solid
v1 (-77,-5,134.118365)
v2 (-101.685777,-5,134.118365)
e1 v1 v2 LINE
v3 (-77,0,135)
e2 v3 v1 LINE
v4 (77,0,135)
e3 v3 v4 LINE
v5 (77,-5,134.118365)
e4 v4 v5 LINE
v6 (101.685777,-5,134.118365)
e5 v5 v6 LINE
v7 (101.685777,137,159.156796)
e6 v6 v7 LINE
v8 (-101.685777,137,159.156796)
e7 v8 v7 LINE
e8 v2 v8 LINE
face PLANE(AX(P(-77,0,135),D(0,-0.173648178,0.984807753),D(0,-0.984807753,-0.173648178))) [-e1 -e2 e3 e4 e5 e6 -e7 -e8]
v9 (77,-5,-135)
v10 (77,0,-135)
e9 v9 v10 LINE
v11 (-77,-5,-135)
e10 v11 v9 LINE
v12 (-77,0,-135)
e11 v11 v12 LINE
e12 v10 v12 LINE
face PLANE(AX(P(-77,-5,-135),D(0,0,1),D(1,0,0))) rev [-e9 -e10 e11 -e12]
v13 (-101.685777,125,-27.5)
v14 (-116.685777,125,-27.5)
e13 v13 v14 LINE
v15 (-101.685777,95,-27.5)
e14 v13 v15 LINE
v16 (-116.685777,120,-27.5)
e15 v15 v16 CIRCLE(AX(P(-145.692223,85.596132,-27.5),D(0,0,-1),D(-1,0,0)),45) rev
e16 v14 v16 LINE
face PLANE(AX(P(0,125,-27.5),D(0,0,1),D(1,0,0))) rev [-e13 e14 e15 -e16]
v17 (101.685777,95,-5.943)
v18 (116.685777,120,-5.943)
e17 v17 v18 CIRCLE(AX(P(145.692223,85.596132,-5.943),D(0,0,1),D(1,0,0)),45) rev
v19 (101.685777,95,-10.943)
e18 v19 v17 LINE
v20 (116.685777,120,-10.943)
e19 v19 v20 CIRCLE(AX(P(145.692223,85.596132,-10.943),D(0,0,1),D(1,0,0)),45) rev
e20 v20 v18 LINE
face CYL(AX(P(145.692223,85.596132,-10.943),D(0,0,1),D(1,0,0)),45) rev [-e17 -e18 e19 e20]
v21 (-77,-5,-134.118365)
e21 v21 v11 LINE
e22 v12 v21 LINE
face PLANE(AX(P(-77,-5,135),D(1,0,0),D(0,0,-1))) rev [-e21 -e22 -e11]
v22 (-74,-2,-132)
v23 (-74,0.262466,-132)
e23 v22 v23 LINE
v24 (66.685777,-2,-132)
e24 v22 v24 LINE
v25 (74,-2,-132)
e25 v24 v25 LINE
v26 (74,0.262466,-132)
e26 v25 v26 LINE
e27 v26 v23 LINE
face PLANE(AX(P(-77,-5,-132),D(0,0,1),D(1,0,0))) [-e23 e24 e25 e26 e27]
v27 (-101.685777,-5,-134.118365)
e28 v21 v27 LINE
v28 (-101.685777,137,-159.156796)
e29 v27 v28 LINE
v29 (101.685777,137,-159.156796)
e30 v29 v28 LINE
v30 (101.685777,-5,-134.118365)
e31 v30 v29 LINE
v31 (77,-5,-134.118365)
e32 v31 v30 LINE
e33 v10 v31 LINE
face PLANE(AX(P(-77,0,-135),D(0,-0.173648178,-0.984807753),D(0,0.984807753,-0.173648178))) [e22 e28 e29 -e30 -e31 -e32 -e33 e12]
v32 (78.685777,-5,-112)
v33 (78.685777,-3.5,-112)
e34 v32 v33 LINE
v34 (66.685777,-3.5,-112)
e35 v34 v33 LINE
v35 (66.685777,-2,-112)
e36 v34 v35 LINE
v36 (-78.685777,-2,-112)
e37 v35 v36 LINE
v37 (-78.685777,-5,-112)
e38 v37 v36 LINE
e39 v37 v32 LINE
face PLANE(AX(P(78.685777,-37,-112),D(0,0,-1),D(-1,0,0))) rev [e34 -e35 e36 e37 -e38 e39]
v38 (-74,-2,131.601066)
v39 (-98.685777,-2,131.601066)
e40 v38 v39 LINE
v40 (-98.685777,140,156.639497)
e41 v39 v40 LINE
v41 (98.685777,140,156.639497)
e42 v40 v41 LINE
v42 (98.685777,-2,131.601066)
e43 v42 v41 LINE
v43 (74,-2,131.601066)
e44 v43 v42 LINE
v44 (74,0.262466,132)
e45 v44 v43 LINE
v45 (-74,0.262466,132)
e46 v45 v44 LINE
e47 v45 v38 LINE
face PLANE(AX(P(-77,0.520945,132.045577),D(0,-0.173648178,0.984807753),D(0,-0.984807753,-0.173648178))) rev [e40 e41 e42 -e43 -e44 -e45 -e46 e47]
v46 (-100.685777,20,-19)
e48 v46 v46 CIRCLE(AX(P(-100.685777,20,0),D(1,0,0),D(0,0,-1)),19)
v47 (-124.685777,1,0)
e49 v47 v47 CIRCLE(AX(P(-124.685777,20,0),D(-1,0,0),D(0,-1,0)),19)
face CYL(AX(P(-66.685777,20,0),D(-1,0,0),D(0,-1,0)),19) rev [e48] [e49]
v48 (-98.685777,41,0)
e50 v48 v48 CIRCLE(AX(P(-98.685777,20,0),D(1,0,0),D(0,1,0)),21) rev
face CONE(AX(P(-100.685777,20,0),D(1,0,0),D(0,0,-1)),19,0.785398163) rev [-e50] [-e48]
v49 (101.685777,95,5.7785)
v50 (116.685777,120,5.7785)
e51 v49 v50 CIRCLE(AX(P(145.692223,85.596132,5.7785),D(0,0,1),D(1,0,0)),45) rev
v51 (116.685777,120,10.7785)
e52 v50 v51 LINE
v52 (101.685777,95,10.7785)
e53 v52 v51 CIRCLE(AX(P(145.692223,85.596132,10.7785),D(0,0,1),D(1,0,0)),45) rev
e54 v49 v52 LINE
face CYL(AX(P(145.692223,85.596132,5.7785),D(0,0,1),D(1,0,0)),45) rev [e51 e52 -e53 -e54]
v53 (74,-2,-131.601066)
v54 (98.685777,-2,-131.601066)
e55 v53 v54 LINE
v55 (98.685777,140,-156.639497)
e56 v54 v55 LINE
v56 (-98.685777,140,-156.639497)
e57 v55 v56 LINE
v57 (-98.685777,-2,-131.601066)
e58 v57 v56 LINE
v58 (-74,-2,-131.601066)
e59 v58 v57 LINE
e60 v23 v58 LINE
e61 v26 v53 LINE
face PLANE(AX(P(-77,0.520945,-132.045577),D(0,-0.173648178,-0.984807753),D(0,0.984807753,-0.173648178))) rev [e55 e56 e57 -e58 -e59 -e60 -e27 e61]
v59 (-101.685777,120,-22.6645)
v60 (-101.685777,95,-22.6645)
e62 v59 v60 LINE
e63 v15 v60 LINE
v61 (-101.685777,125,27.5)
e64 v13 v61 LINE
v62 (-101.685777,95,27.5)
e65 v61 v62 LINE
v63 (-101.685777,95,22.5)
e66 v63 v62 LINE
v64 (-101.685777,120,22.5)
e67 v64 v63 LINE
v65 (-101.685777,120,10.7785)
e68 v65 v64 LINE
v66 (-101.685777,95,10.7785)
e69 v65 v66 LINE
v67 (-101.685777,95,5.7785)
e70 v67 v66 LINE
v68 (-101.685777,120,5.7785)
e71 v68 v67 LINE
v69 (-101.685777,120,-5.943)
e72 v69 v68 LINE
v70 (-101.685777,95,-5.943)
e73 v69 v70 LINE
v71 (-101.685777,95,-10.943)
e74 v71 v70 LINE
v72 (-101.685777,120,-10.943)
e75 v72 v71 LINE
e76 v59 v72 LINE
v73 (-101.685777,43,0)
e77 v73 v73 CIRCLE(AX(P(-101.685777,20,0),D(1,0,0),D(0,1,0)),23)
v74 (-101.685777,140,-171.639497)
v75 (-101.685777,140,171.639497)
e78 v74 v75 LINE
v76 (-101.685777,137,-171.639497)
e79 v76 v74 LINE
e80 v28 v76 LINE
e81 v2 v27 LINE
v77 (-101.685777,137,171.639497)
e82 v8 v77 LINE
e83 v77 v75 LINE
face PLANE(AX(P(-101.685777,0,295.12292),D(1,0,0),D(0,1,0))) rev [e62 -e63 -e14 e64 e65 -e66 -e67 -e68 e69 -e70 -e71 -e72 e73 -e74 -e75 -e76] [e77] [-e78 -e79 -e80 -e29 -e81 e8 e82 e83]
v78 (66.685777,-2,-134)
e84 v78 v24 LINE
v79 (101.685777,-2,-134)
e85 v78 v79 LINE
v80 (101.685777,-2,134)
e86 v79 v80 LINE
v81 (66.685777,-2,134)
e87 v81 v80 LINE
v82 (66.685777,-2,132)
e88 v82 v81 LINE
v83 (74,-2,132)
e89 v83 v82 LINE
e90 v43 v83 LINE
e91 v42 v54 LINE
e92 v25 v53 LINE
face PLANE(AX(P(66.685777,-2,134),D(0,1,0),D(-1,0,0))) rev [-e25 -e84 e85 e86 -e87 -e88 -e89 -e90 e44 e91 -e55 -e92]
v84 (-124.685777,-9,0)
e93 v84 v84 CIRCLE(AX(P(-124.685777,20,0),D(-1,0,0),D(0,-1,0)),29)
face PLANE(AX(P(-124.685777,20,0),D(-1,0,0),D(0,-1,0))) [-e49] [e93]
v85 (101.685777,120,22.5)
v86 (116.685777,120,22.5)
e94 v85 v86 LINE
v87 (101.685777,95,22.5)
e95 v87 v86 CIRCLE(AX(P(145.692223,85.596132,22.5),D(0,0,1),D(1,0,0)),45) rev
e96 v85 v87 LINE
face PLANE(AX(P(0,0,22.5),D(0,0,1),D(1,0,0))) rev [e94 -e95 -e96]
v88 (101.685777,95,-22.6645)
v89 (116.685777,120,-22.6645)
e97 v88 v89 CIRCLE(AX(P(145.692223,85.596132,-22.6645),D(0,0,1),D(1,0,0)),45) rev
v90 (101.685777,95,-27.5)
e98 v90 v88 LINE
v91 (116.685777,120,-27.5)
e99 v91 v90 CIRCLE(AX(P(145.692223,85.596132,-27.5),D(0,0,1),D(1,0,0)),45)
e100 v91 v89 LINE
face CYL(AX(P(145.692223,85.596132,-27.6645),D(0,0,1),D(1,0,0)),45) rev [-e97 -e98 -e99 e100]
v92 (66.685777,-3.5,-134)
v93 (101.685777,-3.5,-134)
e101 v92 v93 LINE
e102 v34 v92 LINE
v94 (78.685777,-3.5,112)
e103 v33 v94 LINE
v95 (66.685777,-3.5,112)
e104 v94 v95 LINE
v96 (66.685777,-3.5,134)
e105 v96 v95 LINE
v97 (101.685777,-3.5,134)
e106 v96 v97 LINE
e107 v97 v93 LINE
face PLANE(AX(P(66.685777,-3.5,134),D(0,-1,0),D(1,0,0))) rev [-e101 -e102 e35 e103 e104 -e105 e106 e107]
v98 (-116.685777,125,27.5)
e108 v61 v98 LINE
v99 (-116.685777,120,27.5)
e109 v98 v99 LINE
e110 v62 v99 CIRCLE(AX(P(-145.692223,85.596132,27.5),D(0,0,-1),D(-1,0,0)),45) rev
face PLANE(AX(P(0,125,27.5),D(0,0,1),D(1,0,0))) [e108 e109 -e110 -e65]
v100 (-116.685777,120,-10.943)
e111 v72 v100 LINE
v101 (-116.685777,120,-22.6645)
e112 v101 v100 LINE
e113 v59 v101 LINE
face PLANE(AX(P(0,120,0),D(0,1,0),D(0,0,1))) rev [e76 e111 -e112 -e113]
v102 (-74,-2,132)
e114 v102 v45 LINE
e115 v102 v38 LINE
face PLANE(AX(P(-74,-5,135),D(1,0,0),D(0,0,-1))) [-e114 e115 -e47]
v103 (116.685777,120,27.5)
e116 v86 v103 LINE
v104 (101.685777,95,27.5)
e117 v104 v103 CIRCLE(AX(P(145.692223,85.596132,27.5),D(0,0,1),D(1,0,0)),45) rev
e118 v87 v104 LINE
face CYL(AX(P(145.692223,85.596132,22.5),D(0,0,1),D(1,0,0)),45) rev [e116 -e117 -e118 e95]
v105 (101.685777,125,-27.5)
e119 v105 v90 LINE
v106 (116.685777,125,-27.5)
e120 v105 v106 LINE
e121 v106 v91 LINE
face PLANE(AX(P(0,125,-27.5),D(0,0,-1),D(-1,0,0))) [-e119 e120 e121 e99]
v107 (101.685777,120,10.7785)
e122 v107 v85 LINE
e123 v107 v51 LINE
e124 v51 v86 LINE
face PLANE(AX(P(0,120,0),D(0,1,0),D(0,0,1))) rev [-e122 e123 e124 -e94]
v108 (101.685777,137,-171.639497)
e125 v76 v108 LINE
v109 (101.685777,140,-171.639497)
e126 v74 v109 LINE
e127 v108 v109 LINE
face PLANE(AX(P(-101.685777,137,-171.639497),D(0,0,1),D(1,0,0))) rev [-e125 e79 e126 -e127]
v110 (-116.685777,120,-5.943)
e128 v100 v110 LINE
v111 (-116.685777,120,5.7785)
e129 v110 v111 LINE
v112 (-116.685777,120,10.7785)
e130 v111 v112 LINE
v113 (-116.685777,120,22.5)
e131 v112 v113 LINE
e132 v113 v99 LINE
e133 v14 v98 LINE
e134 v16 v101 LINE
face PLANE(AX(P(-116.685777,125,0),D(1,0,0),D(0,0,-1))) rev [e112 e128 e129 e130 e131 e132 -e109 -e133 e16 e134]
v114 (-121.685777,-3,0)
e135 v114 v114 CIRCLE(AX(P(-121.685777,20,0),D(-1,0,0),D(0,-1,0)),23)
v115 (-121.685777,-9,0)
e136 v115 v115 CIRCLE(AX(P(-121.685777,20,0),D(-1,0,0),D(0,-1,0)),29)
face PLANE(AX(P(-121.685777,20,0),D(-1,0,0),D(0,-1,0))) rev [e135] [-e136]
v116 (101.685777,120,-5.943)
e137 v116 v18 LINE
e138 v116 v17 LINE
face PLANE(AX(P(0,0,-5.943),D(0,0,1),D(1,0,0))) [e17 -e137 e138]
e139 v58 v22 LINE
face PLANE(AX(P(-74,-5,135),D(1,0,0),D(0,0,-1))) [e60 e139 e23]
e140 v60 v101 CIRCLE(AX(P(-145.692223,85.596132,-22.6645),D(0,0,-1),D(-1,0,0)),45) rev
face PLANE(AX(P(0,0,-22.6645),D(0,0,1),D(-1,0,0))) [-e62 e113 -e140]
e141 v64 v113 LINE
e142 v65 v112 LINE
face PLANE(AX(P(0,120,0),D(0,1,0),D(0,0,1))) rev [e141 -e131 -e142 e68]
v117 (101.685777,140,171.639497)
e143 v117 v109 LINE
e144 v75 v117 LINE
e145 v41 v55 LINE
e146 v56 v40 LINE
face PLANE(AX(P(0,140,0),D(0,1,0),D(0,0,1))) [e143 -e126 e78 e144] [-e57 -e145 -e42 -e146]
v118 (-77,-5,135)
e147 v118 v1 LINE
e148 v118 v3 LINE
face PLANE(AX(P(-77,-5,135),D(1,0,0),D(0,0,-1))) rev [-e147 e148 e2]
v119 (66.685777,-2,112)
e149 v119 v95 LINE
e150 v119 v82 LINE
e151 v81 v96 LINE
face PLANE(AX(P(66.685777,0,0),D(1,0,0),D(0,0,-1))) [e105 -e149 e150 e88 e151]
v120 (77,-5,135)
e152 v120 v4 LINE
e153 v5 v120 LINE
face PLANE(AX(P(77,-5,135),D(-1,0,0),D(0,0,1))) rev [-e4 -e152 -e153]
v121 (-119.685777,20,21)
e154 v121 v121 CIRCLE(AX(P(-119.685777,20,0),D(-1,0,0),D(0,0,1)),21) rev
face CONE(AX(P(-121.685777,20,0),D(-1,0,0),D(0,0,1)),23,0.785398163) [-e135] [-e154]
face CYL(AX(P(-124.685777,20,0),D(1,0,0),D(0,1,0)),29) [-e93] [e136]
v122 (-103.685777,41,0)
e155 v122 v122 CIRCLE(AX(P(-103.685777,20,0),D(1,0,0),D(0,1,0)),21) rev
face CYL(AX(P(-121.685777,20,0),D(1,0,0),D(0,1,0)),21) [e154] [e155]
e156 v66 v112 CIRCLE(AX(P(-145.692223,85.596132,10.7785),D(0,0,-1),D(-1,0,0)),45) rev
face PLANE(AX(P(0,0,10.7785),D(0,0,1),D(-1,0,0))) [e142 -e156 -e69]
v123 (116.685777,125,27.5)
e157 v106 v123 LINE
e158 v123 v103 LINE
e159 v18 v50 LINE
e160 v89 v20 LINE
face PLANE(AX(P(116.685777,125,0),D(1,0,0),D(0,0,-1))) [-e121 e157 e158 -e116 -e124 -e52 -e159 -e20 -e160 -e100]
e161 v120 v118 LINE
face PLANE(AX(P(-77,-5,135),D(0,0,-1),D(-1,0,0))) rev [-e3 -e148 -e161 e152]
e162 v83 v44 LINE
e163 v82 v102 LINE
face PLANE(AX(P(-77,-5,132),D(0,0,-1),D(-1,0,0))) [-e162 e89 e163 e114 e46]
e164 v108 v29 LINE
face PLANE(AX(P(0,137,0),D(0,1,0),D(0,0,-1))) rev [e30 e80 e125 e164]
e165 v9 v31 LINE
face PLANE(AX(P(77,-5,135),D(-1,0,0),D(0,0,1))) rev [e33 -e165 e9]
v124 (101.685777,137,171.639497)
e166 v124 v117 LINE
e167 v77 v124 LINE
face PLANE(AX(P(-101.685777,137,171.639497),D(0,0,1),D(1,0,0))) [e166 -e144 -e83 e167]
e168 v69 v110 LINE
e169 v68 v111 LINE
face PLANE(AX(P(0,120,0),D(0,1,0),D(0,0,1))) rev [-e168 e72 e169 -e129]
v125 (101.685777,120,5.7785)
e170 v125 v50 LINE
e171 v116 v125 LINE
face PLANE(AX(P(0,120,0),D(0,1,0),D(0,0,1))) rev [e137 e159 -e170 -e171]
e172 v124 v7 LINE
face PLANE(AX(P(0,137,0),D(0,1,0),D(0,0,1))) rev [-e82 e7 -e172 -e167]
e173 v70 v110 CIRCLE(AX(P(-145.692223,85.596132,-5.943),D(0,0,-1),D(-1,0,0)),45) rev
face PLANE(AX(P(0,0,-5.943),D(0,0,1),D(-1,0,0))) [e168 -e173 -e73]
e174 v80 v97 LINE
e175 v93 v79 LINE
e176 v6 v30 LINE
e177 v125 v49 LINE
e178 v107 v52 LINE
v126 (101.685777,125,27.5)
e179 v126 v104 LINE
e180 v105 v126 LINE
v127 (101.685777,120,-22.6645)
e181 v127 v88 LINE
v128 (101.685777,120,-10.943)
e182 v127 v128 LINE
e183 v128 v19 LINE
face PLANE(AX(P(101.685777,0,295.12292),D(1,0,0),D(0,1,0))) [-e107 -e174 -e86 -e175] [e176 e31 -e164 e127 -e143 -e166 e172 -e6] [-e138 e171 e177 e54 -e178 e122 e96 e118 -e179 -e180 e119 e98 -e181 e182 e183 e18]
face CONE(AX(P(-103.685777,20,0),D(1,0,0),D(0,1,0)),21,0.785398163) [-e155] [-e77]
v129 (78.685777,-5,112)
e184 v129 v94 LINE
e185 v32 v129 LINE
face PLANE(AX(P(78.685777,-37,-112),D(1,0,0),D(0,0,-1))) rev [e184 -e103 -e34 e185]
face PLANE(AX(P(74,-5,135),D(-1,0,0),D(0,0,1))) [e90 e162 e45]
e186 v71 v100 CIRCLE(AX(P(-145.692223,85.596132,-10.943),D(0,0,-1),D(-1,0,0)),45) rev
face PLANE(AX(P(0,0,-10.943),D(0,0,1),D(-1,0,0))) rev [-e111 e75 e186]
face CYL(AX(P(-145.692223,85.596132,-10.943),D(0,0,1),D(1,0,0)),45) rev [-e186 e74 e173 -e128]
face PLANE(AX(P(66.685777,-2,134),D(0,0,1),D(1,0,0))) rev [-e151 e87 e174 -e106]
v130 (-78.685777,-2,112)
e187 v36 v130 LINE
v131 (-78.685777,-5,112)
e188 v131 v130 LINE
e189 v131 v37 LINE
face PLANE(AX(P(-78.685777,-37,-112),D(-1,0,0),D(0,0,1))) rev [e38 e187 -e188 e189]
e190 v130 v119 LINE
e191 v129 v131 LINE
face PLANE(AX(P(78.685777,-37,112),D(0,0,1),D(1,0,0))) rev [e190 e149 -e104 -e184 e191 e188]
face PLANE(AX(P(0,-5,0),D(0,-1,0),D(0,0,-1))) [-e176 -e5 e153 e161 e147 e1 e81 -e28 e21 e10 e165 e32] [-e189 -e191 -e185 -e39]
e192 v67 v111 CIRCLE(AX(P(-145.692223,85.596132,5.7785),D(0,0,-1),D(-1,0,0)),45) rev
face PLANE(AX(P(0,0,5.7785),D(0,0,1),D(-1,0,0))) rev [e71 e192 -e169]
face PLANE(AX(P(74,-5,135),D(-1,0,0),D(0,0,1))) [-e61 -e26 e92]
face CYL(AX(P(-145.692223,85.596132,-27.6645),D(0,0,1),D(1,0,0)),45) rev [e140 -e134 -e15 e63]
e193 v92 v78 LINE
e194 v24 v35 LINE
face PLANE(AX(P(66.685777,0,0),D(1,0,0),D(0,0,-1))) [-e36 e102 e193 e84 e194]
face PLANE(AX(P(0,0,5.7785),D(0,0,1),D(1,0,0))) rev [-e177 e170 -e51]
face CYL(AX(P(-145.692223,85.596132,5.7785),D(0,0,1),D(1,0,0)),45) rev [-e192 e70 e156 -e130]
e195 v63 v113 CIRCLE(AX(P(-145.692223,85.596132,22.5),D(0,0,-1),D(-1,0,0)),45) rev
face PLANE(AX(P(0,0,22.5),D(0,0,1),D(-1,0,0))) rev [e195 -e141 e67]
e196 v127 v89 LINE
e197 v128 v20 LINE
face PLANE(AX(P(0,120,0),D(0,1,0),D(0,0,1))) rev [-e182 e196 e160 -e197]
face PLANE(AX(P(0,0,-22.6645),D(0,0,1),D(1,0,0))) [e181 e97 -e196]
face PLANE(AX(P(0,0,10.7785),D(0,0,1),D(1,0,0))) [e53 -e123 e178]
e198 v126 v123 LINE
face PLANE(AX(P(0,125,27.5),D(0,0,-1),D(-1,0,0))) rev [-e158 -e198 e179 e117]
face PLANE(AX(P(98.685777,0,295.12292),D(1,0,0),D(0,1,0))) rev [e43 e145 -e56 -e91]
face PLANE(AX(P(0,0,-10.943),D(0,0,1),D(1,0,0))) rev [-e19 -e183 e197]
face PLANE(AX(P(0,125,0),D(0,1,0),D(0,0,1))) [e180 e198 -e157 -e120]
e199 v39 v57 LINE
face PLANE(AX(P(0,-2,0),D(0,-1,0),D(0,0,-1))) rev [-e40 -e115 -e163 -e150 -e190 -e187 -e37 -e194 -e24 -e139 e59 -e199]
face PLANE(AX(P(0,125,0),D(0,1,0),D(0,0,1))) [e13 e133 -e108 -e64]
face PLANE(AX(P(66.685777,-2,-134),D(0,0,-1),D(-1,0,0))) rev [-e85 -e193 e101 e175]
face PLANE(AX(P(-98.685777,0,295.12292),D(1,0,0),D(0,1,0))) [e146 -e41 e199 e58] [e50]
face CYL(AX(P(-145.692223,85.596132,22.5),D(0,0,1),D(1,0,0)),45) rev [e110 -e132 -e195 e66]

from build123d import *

# Parameters (mm, degrees)
SKETCH1_W                       = 154
SKETCH1_H                       = 270
BOSS_EXTRUDE1_DEPTH             = 140
BOSS_EXTRUDE1_DRAFT             = -10
SKETCH2_W                       = 154
SKETCH2_H                       = 270
BOSS_EXTRUDE2_DEPTH             = 5
BOSS_EXTRUDE3_REACH             = 237.456
BOSS_EXTRUDE3_DIRECTION_2_REACH = 237.456
SHELL1_T                        = -3
SKETCH5_W                       = 15
SKETCH5_H                       = 55
BOSS_EXTRUDE4_DEPTH             = 5
BOSS_EXTRUDE5_DEPTH             = 5
LPATTERN1_COUNT                 = 4
LPATTERN1_PITCH                 = 16.7215
SKETCH7_W                       = 15
SKETCH7_H                       = 0.1645
CUT_EXTRUDE2_DEPTH              = 234.966061846
MIRROR2_START                   = -27.5
MIRROR2_OUTLINE_W               = 15
MIRROR2_OUTLINE_H               = 5
MIRROR2_DEPTH                   = 55
MIRROR2_START_2                 = -10.943
MIRROR2_2_DEPTH                 = 5
MIRROR2_START_3                 = 5.7785
MIRROR2_3_DEPTH                 = 5
MIRROR2_START_4                 = 22.5
MIRROR2_4_DEPTH                 = 5
MIRROR2_5_DEPTH                 = 4.8355
SKETCH8_W                       = 268
SKETCH8_H                       = 1.5
CUT_EXTRUDE3_DEPTH              = 35
SKETCH9_R                       = 19
CUT_EXTRUDE4_DEPTH              = 35
SKETCH10_W                      = 157.371554598
SKETCH10_H                      = 224
CUT_EXTRUDE5_DEPTH              = 35
BOSS_EXTRUDE6_START             = 20
SKETCH11_R                      = 21
SKETCH11_R_2                    = 19
BOSS_EXTRUDE6_DEPTH             = 20
BOSS_EXTRUDE7_START             = 3
SKETCH12_R                      = 29
SKETCH12_R_2                    = 19
BOSS_EXTRUDE7_DEPTH             = 3
CHAMFER1_SIZE                   = 2
BOSS_EXTRUDE8_START             = 137
BOSS_EXTRUDE8_2_OUTLINE_W       = 203.371554598
BOSS_EXTRUDE8_2_OUTLINE_H       = 12.482701107
BOSS_EXTRUDE8_2_DEPTH           = 3


with BuildPart() as part:
    # Sketch1 → Boss-Extrude1 (with draft: the straight prism first)
    with BuildSketch(Plane(origin=(0, 0, 0), x_dir=(1, 0, 0), z_dir=(0, 1, 0))):
        Rectangle(SKETCH1_W, SKETCH1_H)
    extrude(amount=BOSS_EXTRUDE1_DEPTH)
    # Boss-Extrude1: the draft: its side faces are tilted about the plane it starts from
    boss_extrude1_sides = [part.faces().sort_by_distance(p)[0] for p in [
        (-77, 70, 0),
        (0, 70, 135),
        (77, 70, 0),
        (0, 70, -135),
    ]]
    draft(boss_extrude1_sides, Plane(origin=(0, 0, 0), x_dir=(1, 0, 0), z_dir=(0, 1, 0)), BOSS_EXTRUDE1_DRAFT)

    # Sketch2 → Boss-Extrude2 (add)
    with BuildSketch(Plane.XZ):
        Rectangle(SKETCH2_W, SKETCH2_H)
    extrude(amount=BOSS_EXTRUDE2_DEPTH)

    # Boss-Extrude3: up to this plane
    boss_extrude3_end = Plane(origin=(-77, 0, 135), z_dir=(0, -0.17364817766693072, 0.984807753012208))
    # Sketch4 → Boss-Extrude3 (add, up to the surface)
    with BuildSketch(Plane.XY, mode=Mode.PRIVATE) as boss_extrude3_sk1:
        Polygon((101.685777299, -5), (77, -5), (77, 0), (101.685777299, 140), align=None)
    boss_extrude3_tool1 = split(extrude(boss_extrude3_sk1.sketch, amount=BOSS_EXTRUDE3_REACH, mode=Mode.PRIVATE), bisect_by=boss_extrude3_end, keep=Keep.BOTH, mode=Mode.PRIVATE)
    boss_extrude3 = boss_extrude3_tool1.solids().sort_by_distance((93.182898, 43.388889, 0))[0]
    add(boss_extrude3)

    # Boss-Extrude3 direction 2: up to this plane
    boss_extrude3_direction_2_end = Plane(origin=(-77, 0, -135), z_dir=(0, -0.17364817766693072, -0.984807753012208))
    # Sketch4 → Boss-Extrude3 direction 2 (add, up to the surface)
    with BuildSketch(Plane.XY, mode=Mode.PRIVATE) as boss_extrude3_direction_2_sk1:
        Polygon((101.685777299, -5), (77, -5), (77, 0), (101.685777299, 140), align=None)
    boss_extrude3_direction_2_tool1 = split(extrude(boss_extrude3_direction_2_sk1.sketch, amount=-BOSS_EXTRUDE3_DIRECTION_2_REACH, mode=Mode.PRIVATE), bisect_by=boss_extrude3_direction_2_end, keep=Keep.BOTH, mode=Mode.PRIVATE)
    boss_extrude3_direction_2 = boss_extrude3_direction_2_tool1.solids().sort_by_distance((93.182898, 43.388889, 0))[0]
    add(boss_extrude3_direction_2)
    boss_extrude3 = boss_extrude3 + boss_extrude3_direction_2  # both directions under the feature's name, for the pattern or mirror that repeats it

    # Mirror1: Boss-Extrude3 across plane
    add(boss_extrude3.mirror(Plane(origin=(0, 0, 0), x_dir=(0, 0, 1), z_dir=(1, 0, 0))))

    # Shell1
    shell1_openings = [part.faces().sort_by_distance(p)[0] for p in [
        (0, 140, 0),
    ]]
    offset(amount=SHELL1_T, openings=shell1_openings, kind=Kind.INTERSECTION)

    # Sketch5 → Boss-Extrude4 (add)
    with BuildSketch(Plane(origin=(0, 120, 0), x_dir=(1, 0, 0), z_dir=(0, 1, 0))):
        with Locations((109.185777299, 0)):
            Rectangle(SKETCH5_W, SKETCH5_H)
    extrude(amount=BOSS_EXTRUDE4_DEPTH)

    # Sketch6 → Boss-Extrude5 (add)
    with BuildSketch(Plane.XY.offset(27.5)):
        with BuildLine():
            Line((101.685777299, 120), (101.685777299, 95))
            ThreePointArc((101.685777299, 95), (107.105041487, 108.748441487), (116.685777299, 120))
            Line((116.685777299, 120), (101.685777299, 120))
        make_face()
    boss_extrude5 = extrude(amount=-BOSS_EXTRUDE5_DEPTH)

    # LPattern1: Boss-Extrude5 ×4
    with Locations(*[(0, 0, -i * LPATTERN1_PITCH) for i in range(1, LPATTERN1_COUNT)]):
        add(boss_extrude5)

    # Sketch7 → Cut-Extrude2 (cut, through all)
    with BuildSketch(Plane(origin=(0, 120, 0), x_dir=(1, 0, 0), z_dir=(0, 1, 0))):
        with Locations((109.185777299, 27.58225)):
            Rectangle(SKETCH7_W, SKETCH7_H)
    extrude(amount=-CUT_EXTRUDE2_DEPTH, mode=Mode.SUBTRACT)

    # Mirror2: read off the stored shape, not the designer's step
    # Mirror2 outline → Mirror2 (add)
    with BuildSketch(Plane.XY.offset(MIRROR2_START)):
        with Locations((-109.185777299, 122.5)):
            Rectangle(MIRROR2_OUTLINE_W, MIRROR2_OUTLINE_H)
    extrude(amount=MIRROR2_DEPTH)

    # Mirror2 2 outline → Mirror2 2 (add)
    with BuildSketch(Plane.XY.offset(MIRROR2_START_2)):
        with BuildLine():
            ThreePointArc((-116.685777299, 120), (-107.105041487, 108.748441487), (-101.685777299, 95))
            Line((-101.685777299, 95), (-101.685777299, 120))
            Line((-101.685777299, 120), (-116.685777299, 120))
        make_face()
    extrude(amount=MIRROR2_2_DEPTH)

    # Mirror2 3 outline → Mirror2 3 (add)
    with BuildSketch(Plane.XY.offset(MIRROR2_START_3)):
        with BuildLine():
            ThreePointArc((-116.685777299, 120), (-107.105041487, 108.748441487), (-101.685777299, 95))
            Line((-101.685777299, 95), (-101.685777299, 120))
            Line((-101.685777299, 120), (-116.685777299, 120))
        make_face()
    extrude(amount=MIRROR2_3_DEPTH)

    # Mirror2 4 outline → Mirror2 4 (add)
    with BuildSketch(Plane.XY.offset(MIRROR2_START_4)):
        with BuildLine():
            ThreePointArc((-116.685777299, 120), (-107.105041487, 108.748441487), (-101.685777299, 95))
            Line((-101.685777299, 95), (-101.685777299, 120))
            Line((-101.685777299, 120), (-116.685777299, 120))
        make_face()
    extrude(amount=MIRROR2_4_DEPTH)

    # Mirror2 5 outline → Mirror2 5 (add)
    with BuildSketch(Plane.XY.offset(MIRROR2_START)):
        with BuildLine():
            ThreePointArc((-116.685777299, 120), (-107.105041487, 108.748441487), (-101.685777299, 95))
            Line((-101.685777299, 95), (-101.685777299, 120))
            Line((-101.685777299, 120), (-116.685777299, 120))
        make_face()
    extrude(amount=MIRROR2_5_DEPTH)

    # Sketch8 → Cut-Extrude3 (cut)
    with BuildSketch(Plane(origin=(101.685777299, 0, 0), x_dir=(0, 0, -1), z_dir=(1, 0, 0))):
        with Locations((0, -2.75)):
            Rectangle(SKETCH8_W, SKETCH8_H)
    extrude(amount=-CUT_EXTRUDE3_DEPTH, mode=Mode.SUBTRACT)

    # Sketch9 → Cut-Extrude4 (cut)
    with BuildSketch(Plane.ZY.offset(101.685777299)):
        with Locations(Location((0, 20, 0), (0, 0, 270))):
            Circle(SKETCH9_R)
    extrude(amount=-CUT_EXTRUDE4_DEPTH, mode=Mode.SUBTRACT)

    # Sketch10 → Cut-Extrude5 (cut)
    with BuildSketch(Plane(origin=(0, -2, 0), x_dir=(1, 0, 0), z_dir=(0, 1, 0))):
        Rectangle(SKETCH10_W, SKETCH10_H)
    extrude(amount=-CUT_EXTRUDE5_DEPTH, mode=Mode.SUBTRACT)

    # Sketch11 → Boss-Extrude6 (add)
    with BuildSketch(Plane.ZY.offset(101.685777299).offset(BOSS_EXTRUDE6_START)):
        with Locations(Location((0, 20, 0), (0, 0, 90))):
            Circle(SKETCH11_R)
        with Locations(Location((0, 20, 0), (0, 0, 270))):
            Circle(SKETCH11_R_2, mode=Mode.SUBTRACT)
    extrude(amount=-BOSS_EXTRUDE6_DEPTH)

    # Sketch12 → Boss-Extrude7 (add)
    with BuildSketch(Plane.ZY.offset(121.685777299).offset(BOSS_EXTRUDE7_START)):
        with Locations(Location((0, 20, 0), (0, 0, 270))):
            Circle(SKETCH12_R)
        with Locations(Location((0, 20, 0), (0, 0, 270))):
            Circle(SKETCH12_R_2, mode=Mode.SUBTRACT)
    extrude(amount=-BOSS_EXTRUDE7_DEPTH)

    # Chamfer1
    chamfer1_edges = [part.edges().sort_by_distance(p)[0] for p in [
        (-98.685777299, 39, 0),
    ]]
    chamfer(chamfer1_edges, length=CHAMFER1_SIZE)

    # Boss-Extrude8: read off the stored shape, not the designer's step
    # Boss-Extrude8 outline → Boss-Extrude8 (revolve)
    with BuildSketch(Plane(origin=(0, 20, 0), x_dir=(0, 1, 0), z_dir=(0, 0, -1))):
        Polygon((23, -121.685777299), (21, -119.685777299), (21, -121.685777299), align=None)
        Polygon((21, -101.685777299), (21, -103.685777299), (23, -101.685777299), align=None)
    boss_extrude8 = revolve(axis=Axis((0, 20, 0), (1, 0, 0)))

    # Boss-Extrude8 2 outline → Boss-Extrude8 2 (add)
    with BuildSketch(Plane(origin=(0, 0, 0), x_dir=(1, 0, 0), z_dir=(0, 1, 0)).offset(BOSS_EXTRUDE8_START)):
        with Locations((0, -165.398146911)):
            Rectangle(BOSS_EXTRUDE8_2_OUTLINE_W, BOSS_EXTRUDE8_2_OUTLINE_H)
    boss_extrude8_2 = extrude(amount=BOSS_EXTRUDE8_2_DEPTH)

    # Mirror3: Boss-Extrude8, Boss-Extrude8 2 across plane
    add(boss_extrude8.mirror(Plane.XY))
    add(boss_extrude8_2.mirror(Plane.XY))


solid = part.part
